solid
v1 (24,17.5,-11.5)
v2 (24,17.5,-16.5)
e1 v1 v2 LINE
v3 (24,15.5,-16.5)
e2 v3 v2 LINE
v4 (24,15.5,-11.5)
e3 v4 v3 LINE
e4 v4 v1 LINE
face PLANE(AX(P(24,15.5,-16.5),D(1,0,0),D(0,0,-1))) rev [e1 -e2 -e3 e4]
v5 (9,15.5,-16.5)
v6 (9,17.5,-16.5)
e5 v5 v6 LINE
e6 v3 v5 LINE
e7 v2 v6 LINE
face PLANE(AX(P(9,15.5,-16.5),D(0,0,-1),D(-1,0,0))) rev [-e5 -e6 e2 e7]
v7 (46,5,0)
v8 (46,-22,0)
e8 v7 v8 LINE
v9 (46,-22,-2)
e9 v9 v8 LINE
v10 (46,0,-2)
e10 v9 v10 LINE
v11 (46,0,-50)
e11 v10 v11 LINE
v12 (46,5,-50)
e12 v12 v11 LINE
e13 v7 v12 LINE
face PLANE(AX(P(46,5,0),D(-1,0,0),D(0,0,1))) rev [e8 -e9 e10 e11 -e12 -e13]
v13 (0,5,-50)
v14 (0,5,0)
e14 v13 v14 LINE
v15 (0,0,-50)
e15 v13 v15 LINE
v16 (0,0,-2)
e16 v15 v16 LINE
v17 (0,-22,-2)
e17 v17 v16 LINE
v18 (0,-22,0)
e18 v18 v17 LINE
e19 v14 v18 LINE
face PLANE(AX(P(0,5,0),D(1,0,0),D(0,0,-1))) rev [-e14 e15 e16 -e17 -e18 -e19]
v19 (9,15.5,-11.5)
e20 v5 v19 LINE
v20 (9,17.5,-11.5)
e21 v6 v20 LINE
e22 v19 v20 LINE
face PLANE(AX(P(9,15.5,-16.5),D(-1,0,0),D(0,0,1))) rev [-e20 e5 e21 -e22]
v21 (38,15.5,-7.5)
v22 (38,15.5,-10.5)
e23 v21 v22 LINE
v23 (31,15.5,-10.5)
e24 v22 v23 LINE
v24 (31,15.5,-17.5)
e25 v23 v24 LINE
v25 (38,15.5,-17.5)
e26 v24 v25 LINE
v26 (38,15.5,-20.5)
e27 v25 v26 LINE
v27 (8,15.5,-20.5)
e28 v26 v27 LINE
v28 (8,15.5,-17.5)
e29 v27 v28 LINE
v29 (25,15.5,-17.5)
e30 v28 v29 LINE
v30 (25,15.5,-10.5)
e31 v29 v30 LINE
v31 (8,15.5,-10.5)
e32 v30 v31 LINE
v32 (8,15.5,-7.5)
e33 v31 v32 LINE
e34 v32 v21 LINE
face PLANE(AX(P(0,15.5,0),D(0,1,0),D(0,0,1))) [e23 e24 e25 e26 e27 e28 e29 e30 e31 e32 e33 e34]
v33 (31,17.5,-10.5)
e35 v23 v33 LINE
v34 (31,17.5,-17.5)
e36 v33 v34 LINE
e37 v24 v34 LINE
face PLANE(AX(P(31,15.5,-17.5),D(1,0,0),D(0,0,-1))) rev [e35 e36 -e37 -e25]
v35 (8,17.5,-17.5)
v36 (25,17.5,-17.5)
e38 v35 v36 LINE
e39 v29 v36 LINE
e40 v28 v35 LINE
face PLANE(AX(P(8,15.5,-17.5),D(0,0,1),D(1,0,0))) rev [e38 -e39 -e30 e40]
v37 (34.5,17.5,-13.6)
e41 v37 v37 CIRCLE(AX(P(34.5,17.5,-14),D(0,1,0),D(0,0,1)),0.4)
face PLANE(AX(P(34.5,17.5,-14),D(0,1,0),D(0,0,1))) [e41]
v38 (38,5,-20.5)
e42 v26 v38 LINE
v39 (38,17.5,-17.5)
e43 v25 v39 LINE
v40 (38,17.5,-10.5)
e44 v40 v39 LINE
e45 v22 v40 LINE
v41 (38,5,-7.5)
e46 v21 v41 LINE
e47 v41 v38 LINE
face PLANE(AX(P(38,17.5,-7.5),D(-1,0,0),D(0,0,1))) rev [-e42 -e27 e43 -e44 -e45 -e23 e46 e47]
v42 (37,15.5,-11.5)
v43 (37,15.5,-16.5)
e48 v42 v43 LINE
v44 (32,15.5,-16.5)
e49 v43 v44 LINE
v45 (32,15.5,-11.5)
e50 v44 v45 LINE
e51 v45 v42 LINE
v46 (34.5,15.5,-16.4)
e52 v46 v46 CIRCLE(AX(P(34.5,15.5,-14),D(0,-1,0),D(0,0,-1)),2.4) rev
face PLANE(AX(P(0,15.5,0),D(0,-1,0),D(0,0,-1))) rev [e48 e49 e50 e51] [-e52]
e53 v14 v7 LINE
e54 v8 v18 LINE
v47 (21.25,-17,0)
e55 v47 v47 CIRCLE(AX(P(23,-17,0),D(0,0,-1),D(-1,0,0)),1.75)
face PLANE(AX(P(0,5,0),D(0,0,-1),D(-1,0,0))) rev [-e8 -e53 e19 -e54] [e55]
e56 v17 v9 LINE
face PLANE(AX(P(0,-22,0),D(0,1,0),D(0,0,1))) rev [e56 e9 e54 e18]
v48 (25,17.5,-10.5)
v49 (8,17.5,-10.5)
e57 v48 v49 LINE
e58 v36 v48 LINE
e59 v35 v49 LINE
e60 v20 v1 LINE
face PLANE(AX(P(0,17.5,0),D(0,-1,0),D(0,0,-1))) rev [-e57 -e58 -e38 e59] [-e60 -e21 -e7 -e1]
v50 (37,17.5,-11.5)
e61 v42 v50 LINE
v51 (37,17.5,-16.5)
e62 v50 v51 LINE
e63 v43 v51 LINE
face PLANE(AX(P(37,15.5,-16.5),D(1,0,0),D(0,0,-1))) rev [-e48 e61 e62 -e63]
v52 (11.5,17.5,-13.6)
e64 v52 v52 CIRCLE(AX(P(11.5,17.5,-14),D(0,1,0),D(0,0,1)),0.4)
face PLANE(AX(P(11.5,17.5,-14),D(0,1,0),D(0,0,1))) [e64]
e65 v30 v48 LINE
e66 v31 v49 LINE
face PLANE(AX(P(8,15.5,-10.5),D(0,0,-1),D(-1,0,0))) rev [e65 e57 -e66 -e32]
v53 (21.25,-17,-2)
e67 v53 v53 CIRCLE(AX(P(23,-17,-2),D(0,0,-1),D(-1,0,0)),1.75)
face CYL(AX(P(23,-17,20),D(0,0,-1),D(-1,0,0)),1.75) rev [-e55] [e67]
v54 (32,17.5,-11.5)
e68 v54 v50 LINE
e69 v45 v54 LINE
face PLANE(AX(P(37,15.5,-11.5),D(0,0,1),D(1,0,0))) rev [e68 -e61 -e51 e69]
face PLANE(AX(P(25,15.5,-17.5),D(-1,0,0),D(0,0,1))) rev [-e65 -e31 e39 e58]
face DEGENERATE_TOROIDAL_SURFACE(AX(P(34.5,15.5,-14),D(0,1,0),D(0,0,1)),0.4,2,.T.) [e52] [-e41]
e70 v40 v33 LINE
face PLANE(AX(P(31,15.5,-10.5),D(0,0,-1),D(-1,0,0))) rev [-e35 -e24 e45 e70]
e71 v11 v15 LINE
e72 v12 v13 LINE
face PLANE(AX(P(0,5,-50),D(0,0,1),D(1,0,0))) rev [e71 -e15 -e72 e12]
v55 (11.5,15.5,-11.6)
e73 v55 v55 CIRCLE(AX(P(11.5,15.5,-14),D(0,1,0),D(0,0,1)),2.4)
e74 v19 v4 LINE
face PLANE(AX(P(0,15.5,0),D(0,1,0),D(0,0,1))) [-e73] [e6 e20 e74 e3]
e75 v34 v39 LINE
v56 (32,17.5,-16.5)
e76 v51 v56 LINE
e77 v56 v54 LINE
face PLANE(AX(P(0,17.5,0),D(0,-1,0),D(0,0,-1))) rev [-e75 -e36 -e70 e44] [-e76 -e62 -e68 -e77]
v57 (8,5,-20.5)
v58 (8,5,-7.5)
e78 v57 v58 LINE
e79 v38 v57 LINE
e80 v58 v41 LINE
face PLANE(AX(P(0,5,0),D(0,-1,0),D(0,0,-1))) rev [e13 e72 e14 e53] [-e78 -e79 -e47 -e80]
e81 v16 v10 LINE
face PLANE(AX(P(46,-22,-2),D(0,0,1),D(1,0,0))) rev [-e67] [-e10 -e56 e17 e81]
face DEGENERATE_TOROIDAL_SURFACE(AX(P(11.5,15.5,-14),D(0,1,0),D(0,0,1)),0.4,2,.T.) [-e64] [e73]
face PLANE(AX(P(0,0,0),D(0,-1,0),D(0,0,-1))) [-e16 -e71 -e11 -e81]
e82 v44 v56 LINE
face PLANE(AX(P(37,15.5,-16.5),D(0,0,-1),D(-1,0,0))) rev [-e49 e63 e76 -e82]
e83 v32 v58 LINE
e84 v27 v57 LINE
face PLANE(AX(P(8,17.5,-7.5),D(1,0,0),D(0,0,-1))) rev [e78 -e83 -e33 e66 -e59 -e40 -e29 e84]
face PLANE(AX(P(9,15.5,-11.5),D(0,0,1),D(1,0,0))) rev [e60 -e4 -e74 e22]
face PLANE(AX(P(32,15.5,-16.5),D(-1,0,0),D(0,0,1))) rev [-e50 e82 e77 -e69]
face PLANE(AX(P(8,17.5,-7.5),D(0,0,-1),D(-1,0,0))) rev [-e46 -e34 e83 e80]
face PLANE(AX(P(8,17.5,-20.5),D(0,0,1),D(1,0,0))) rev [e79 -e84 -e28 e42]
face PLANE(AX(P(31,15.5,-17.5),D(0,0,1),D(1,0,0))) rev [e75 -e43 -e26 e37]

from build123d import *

# Parameters (mm, degrees)
SKETCH1_W           = 46
SKETCH1_H           = 50
BOSS_EXTRUDE1_DEPTH = 5
SKETCH2_W           = 30
SKETCH2_H           = 13
BOSS_EXTRUDE2_DEPTH = 12.5
SKETCH3_W           = 46
SKETCH3_H           = 2
BOSS_EXTRUDE3_DEPTH = 22
SKETCH4_R           = 1.75
CUT_EXTRUDE1_DEPTH  = 22
SKETCH5_W           = 15
SKETCH5_H           = 5
SKETCH5_W_2         = 5
CUT_EXTRUDE2_DEPTH  = 2
SKETCH6_R           = 2.4
BOSS_EXTRUDE6_DEPTH = 2
FILLET1_R           = 2


with BuildPart() as part:
    # Sketch1 → Boss-Extrude1 (new body)
    with BuildSketch(Plane(origin=(0, 0, 0), x_dir=(1, 0, 0), z_dir=(0, 1, 0))):
        with Locations((23, 25)):
            Rectangle(SKETCH1_W, SKETCH1_H)
    extrude(amount=BOSS_EXTRUDE1_DEPTH)

    # Sketch2 → Boss-Extrude2 (add)
    with BuildSketch(Plane(origin=(0, 5, 0), x_dir=(1, 0, 0), z_dir=(0, 1, 0))):
        with Locations((23, 14)):
            Rectangle(SKETCH2_W, SKETCH2_H)
    extrude(amount=BOSS_EXTRUDE2_DEPTH)

    # Sketch3 → Boss-Extrude3 (add)
    with BuildSketch(Plane.XZ):
        with Locations((23, -1)):
            Rectangle(SKETCH3_W, SKETCH3_H)
    extrude(amount=BOSS_EXTRUDE3_DEPTH)

    # Sketch4 → Cut-Extrude1 (cut)
    with BuildSketch(Plane(origin=(0, 0, -2), x_dir=(-1, 0, 0), z_dir=(0, 0, -1))):
        with Locations((-23, -17)):
            Circle(SKETCH4_R)
    extrude(amount=-CUT_EXTRUDE1_DEPTH, mode=Mode.SUBTRACT)

    # Sketch5 → Cut-Extrude2 (cut)
    with BuildSketch(Plane(origin=(0, 17.5, 0), x_dir=(1, 0, 0), z_dir=(0, 1, 0))):
        with Locations((16.5, 14)):
            Rectangle(SKETCH5_W, SKETCH5_H)
        with Locations((34.5, 14)):
            Rectangle(SKETCH5_W_2, SKETCH5_H)
        Polygon((31, 17.5), (31, 10.5), (38, 10.5), (38, 7.5), (8, 7.5), (8, 10.5), (25, 10.5), (25, 17.5), (8, 17.5), (8, 20.5), (38, 20.5), (38, 17.5), align=None)
    extrude(amount=-CUT_EXTRUDE2_DEPTH, mode=Mode.SUBTRACT)

    # Sketch6 → Boss-Extrude6 (add)
    with BuildSketch(Plane(origin=(0, 15.5, 0), x_dir=(1, 0, 0), z_dir=(0, 1, 0))):
        with Locations(Location((11.5, 14, 0), (0, 0, 270))):
            Circle(SKETCH6_R)
        with Locations(Location((34.5, 14, 0), (0, 0, 90))):
            Circle(SKETCH6_R)
    extrude(amount=BOSS_EXTRUDE6_DEPTH)

    # Fillet1
    fillet1_edges = [part.edges().sort_by_distance(p)[0] for p in [
        (11.5, 17.5, -16.4),
        (34.5, 17.5, -11.6),
    ]]
    fillet(fillet1_edges, radius=FILLET1_R - 0.0001)  # a hair under: the kernel refuses the full size


solid = part.part
